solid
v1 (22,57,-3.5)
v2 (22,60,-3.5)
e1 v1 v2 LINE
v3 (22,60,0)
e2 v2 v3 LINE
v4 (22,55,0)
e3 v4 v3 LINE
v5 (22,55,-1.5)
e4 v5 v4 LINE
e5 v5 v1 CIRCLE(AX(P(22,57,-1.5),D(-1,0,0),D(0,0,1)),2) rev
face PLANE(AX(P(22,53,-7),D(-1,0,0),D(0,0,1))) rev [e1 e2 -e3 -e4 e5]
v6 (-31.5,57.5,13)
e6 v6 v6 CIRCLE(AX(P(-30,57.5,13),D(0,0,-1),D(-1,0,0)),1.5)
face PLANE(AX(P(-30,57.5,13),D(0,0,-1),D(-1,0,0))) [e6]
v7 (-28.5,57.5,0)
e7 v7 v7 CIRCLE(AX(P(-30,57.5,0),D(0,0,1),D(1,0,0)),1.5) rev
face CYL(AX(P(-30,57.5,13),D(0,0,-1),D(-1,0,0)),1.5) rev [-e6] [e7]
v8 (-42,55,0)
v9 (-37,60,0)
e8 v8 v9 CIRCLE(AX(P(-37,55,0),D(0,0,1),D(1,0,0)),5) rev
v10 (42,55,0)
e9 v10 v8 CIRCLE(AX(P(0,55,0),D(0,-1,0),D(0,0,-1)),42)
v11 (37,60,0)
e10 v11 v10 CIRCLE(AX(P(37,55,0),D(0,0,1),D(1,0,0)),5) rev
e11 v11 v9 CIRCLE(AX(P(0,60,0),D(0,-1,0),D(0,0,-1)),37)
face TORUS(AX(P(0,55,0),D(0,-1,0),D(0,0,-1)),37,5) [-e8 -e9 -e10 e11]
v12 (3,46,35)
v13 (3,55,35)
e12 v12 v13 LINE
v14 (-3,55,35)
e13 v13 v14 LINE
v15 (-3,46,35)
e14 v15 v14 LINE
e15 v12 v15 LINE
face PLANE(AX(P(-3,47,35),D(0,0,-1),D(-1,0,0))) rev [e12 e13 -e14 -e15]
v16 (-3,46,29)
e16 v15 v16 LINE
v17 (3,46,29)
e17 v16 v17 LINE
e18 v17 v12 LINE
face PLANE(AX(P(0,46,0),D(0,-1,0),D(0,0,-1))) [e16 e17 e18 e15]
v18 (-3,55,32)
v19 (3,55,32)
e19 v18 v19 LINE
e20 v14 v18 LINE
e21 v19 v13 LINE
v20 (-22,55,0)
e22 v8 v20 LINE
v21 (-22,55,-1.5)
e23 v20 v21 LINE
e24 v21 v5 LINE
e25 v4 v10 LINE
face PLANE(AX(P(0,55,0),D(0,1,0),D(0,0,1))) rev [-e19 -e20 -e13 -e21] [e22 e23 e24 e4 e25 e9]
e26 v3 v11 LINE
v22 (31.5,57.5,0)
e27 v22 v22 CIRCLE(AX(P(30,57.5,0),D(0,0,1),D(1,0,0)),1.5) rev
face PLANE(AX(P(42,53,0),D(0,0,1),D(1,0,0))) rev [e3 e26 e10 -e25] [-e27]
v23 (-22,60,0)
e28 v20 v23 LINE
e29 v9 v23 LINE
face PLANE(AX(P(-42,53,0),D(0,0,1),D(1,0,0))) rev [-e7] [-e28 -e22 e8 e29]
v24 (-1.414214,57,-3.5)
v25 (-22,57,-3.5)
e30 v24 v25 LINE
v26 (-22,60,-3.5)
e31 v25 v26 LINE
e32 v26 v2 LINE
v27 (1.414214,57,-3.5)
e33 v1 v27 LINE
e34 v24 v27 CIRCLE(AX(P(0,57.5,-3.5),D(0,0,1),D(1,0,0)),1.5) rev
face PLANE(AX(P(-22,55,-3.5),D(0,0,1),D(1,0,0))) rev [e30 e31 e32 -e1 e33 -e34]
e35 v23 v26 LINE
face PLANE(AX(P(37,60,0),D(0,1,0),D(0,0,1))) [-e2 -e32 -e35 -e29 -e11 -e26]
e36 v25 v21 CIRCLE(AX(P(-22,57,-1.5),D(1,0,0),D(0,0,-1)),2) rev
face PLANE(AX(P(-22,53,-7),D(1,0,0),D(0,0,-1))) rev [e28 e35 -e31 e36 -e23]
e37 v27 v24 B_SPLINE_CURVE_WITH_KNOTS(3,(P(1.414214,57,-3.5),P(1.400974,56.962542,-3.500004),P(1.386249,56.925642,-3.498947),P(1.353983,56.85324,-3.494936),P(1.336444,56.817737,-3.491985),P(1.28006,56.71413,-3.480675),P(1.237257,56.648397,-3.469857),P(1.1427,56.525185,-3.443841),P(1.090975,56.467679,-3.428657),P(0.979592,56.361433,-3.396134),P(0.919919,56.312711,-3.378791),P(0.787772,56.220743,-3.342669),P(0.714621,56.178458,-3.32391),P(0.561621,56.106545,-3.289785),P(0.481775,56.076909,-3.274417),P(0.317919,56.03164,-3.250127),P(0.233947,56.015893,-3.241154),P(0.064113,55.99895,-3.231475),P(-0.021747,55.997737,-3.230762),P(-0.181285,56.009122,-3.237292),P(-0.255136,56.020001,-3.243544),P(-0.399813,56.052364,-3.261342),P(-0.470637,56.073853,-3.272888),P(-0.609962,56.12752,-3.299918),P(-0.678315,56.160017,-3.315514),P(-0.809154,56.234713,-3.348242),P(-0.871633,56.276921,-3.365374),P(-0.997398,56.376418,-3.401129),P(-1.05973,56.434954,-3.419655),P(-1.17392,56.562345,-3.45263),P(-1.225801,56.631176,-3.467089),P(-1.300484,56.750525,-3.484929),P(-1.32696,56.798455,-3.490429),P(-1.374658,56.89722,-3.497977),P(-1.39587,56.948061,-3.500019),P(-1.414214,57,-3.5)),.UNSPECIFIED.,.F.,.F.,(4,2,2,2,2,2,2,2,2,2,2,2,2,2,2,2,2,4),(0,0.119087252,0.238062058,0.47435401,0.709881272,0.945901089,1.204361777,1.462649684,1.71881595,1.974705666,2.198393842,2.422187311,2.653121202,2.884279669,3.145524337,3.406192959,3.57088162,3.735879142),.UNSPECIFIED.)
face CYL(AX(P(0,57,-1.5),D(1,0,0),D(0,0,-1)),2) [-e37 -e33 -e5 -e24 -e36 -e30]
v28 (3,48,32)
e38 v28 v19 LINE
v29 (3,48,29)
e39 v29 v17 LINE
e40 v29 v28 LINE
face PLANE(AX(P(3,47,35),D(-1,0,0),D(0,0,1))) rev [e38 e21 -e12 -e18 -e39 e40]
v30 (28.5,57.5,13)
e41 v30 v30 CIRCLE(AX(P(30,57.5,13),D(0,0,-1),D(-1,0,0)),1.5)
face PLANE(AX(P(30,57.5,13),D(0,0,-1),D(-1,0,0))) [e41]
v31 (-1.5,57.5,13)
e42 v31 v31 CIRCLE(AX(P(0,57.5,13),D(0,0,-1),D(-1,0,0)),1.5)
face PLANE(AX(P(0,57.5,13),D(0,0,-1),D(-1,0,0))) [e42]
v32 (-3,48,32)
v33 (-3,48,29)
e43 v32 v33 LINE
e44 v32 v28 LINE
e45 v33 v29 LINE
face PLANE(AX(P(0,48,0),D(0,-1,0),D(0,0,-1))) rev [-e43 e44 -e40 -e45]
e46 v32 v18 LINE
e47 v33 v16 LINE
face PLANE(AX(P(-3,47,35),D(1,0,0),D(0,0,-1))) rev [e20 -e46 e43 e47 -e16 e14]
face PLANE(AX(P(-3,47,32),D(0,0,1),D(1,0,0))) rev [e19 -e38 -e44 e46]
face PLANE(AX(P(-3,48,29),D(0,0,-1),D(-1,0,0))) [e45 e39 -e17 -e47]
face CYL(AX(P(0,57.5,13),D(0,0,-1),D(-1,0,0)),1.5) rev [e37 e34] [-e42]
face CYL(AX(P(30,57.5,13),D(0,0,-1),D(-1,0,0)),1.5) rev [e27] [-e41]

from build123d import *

# Parameters (mm, degrees)
CUT_EXTRUDE1_DEPTH       = 5
CUT_EXTRUDE3_DEPTH       = 45
SKETCH8_R                = 40
CUT_EXTRUDE4_DEPTH       = 32
SKETCH9_R                = 32
SKETCH9_R_2              = 24.5
CUT_EXTRUDE5_DEPTH       = 14
SKETCH10_R               = 26
CUT_EXTRUDE6_DEPTH       = 14
FILLET1_R                = 7
FILLET2_R                = 7
CUT_REVOLVE1_START       = 22
CUT_REVOLVE1_DEPTH       = 30.5
CUT_EXTRUDE12_DEPTH      = 5
SKETCH18_W               = 13
SKETCH18_H               = 8
CUT_EXTRUDE13_DEPTH      = 5
INTERSECT1_OUTLINE_R     = 42
INTERSECT1_DEPTH         = 55
SKETCH20_W               = 6
SKETCH20_H               = 3
BOSS_EXTRUDE1_DEPTH      = 8
BOSS_EXTRUDE2_DEPTH      = 1
BOSS_EXTRUDE2_DEPTH_BACK = 1
SKETCH21_W               = 6
SKETCH21_H               = 6
BOSS_EXTRUDE3_DEPTH      = 7
SKETCH19_R               = 1.5
CUT_EXTRUDE14_DEPTH      = 20
SKETCH23_W               = 20
SKETCH23_H               = 7
CUT_EXTRUDE15_DEPTH      = 7
SKETCH24_W               = 44
SKETCH24_H               = 3.5
CUT_EXTRUDE16_DEPTH      = 5
FILLET3_R                = 2


# Read off the part's stored shape, not the designer's step: Cut-Revolve1, Intersect1
with BuildPart() as part:
    # Sketch1 → Revolve1 (revolve)
    with BuildSketch(Plane.XY, mode=Mode.PRIVATE) as revolve1_sk:
        with BuildLine():
            Line((22.5, 0), (32, 0))
            ThreePointArc((32, 0), (33.414213562, 0.585786438), (34, 2))
            Line((34, 2), (34, 18))
            Line((34, 18), (40, 18))
            ThreePointArc((40, 18), (41.414213562, 18.585786438), (42, 20))
            Line((42, 20), (42, 55))
            ThreePointArc((42, 55), (40.535533906, 58.535533906), (37, 60))
            Line((37, 60), (0, 60))
            Line((0, 60), (0, 18))
            Line((0, 18), (22.5, 18))
            Line((22.5, 18), (22.5, 0))
        make_face()
    revolve(revolve1_sk.sketch.rotate(Axis((0, 2, 0), (0, 1, 0)), 90), axis=Axis((0, 2, 0), (0, 1, 0)))

    # Sketch5 → Cut-Extrude1 (cut)
    with BuildSketch(Plane(origin=(0, 60, 0), x_dir=(1, 0, 0), z_dir=(0, 1, 0))):
        with BuildLine():
            Line((-42, 0), (-40, 0))
            Line((-40, 0), (40, 0))
            Line((40, 0), (42, 0))
            ThreePointArc((42, 0), (0, 42), (-42, 0))
        make_face()
    extrude(amount=-CUT_EXTRUDE1_DEPTH, mode=Mode.SUBTRACT)

    # Sketch7 → Cut-Extrude3 (cut)
    with BuildSketch(Plane.XZ.offset(-18)):
        with BuildLine():
            Line((-21, 0), (21, 0))
            ThreePointArc((21, 0), (0, -21), (-21, 0))
        make_face()
    extrude(amount=-CUT_EXTRUDE3_DEPTH, mode=Mode.SUBTRACT)

    # Sketch8 → Cut-Extrude4 (cut)
    with BuildSketch(Plane(origin=(0, 52.5, 0), x_dir=(1, 0, 0), z_dir=(0, 1, 0))):
        with Locations(Location((0, 0, 0), (0, 0, 270))):
            Circle(SKETCH8_R)
        with BuildLine():
            Line((22.912878475, -2), (-22.912878475, -2))
            ThreePointArc((-22.912878475, -2), (0, 23), (22.912878475, -2))
        make_face(mode=Mode.SUBTRACT)
    extrude(amount=-CUT_EXTRUDE4_DEPTH, mode=Mode.SUBTRACT)

    # Sketch9 → Cut-Extrude5 (cut)
    with BuildSketch(Plane(origin=(0, 2, 0), x_dir=(-1, 0, 0), z_dir=(0, -1, 0))):
        with Locations(Location((0, 0, 0), (0, 0, 90))):
            Circle(SKETCH9_R)
        with Locations(Location((0, 0, 0), (0, 0, 90))):
            Circle(SKETCH9_R_2, mode=Mode.SUBTRACT)
    extrude(amount=-CUT_EXTRUDE5_DEPTH, mode=Mode.SUBTRACT)

    # Sketch10 → Cut-Extrude6 (cut)
    with BuildSketch(Plane(origin=(0, 2, 0), x_dir=(-1, 0, 0), z_dir=(0, -1, 0))):
        Circle(SKETCH10_R)
    extrude(amount=-CUT_EXTRUDE6_DEPTH, mode=Mode.SUBTRACT)

    # Fillet1
    fillet1_edges = [part.edges().sort_by_distance(p)[0] for p in [
        (21, 36.5, 0),
        (-21, 36.5, 0),
    ]]
    fillet(fillet1_edges, radius=FILLET1_R)

    # Fillet2
    fillet2_edges = [part.edges().sort_by_distance(p)[0] for p in [
        (-22.912878475, 36.5, 2),
        (22.912878475, 36.5, 2),
    ]]
    fillet(fillet2_edges, radius=FILLET2_R)

    # Cut-Revolve1 outline → Cut-Revolve1 (cut)
    with BuildSketch(Plane(origin=(0, 0, 0), x_dir=(1, 0, 0), z_dir=(0, 1, 0)).offset(CUT_REVOLVE1_START)):
        with BuildLine():
            Line((-34.641016151, -20), (-36.373066959, -21))
            ThreePointArc((-36.373066959, -21), (0, -42), (36.373066959, -21))
            Line((36.373066959, -21), (34.641016151, -20))
            ThreePointArc((34.641016151, -20), (0, -40), (-34.641016151, -20))
        make_face()
    extrude(amount=CUT_REVOLVE1_DEPTH, mode=Mode.SUBTRACT)

    # Sketch15 → Cut-Extrude12 (cut)
    with BuildSketch(Plane(origin=(0, 20.5, 0), x_dir=(1, 0, 0), z_dir=(0, 1, 0))):
        with BuildLine():
            Line((-28.124355653, -3.514579578), (-26.124355653, -3.514579578))
            ThreePointArc((-26.124355653, -3.514579578), (-24.710142091, -2.928793141), (-24.124355653, -1.514579578))
            Line((-24.124355653, -1.514579578), (-24.124355653, 8.485420422))
            ThreePointArc((-24.124355653, 8.485420422), (-24.710142091, 9.899633984), (-26.124355653, 10.485420422))
            Line((-26.124355653, 10.485420422), (-28.124355653, 10.485420422))
            ThreePointArc((-28.124355653, 10.485420422), (-29.538569215, 9.899633984), (-30.124355653, 8.485420422))
            Line((-30.124355653, 8.485420422), (-30.124355653, -1.514579578))
            ThreePointArc((-30.124355653, -1.514579578), (-29.538569215, -2.928793141), (-28.124355653, -3.514579578))
        make_face()
    extrude(amount=-CUT_EXTRUDE12_DEPTH, mode=Mode.SUBTRACT)

    # Sketch18 → Cut-Extrude13 (cut)
    with BuildSketch(Plane(origin=(0, 55, 0), x_dir=(1, 0, 0), z_dir=(0, 1, 0))):
        with Locations((0.796512215, 32.951769165)):
            Rectangle(SKETCH18_W, SKETCH18_H)
    extrude(amount=-CUT_EXTRUDE13_DEPTH, mode=Mode.SUBTRACT)

    # Intersect1 outline → Intersect1 (cut)
    with BuildSketch(Plane(origin=(0, 0, 0), x_dir=(1, 0, 0), z_dir=(0, 1, 0))):
        Circle(INTERSECT1_OUTLINE_R)
        with BuildLine():
            Line((12.124355653, 0), (-12.124355653, 0))
            ThreePointArc((-12.124355653, 0), (-18.186533479, 3.5), (-18.186533479, 10.5))
            ThreePointArc((-18.186533479, 10.5), (0, 21), (18.186533479, 10.5))
            ThreePointArc((18.186533479, 10.5), (18.186533479, 3.5), (12.124355653, 0))
        make_face(mode=Mode.SUBTRACT)
    extrude(amount=INTERSECT1_DEPTH, mode=Mode.SUBTRACT)

    # Sketch20 → Boss-Extrude1 (add)
    with BuildSketch(Plane.XZ.offset(-55)):
        with Locations((0, 33.5)):
            Rectangle(SKETCH20_W, SKETCH20_H)
    extrude(amount=BOSS_EXTRUDE1_DEPTH)

    # Sketch21 → Boss-Extrude2 (add, two sides: drawn at the far end of the back side and taken through both)
    with BuildSketch(Plane.XZ.offset(-47).offset(-BOSS_EXTRUDE2_DEPTH_BACK)):
        with Locations((0, 32)):
            Rectangle(SKETCH21_W, SKETCH21_H)
    extrude(amount=BOSS_EXTRUDE2_DEPTH + BOSS_EXTRUDE2_DEPTH_BACK)

    # Sketch22 → Boss-Extrude3 (add)
    with BuildSketch(Plane(origin=(0, 0, 0), x_dir=(-1, 0, 0), z_dir=(0, 0, -1))):
        with BuildLine():
            Line((-42, 55), (42, 55))
            ThreePointArc((42, 55), (40.535533906, 58.535533906), (37, 60))
            Line((37, 60), (-37, 60))
            ThreePointArc((-37, 60), (-40.535533906, 58.535533906), (-42, 55))
        make_face()
    extrude(amount=BOSS_EXTRUDE3_DEPTH)

    # Sketch19 → Cut-Extrude14 (cut)
    with BuildSketch(Plane(origin=(0, 0, -7), x_dir=(-1, 0, 0), z_dir=(0, 0, -1))):
        with Locations((0, 57.5)):
            Circle(SKETCH19_R)
        with Locations((-30, 57.5)):
            Circle(SKETCH19_R)
        with Locations((30, 57.5)):
            Circle(SKETCH19_R)
    extrude(amount=-CUT_EXTRUDE14_DEPTH, mode=Mode.SUBTRACT)

    # Sketch23 → Cut-Extrude15 (cut)
    with BuildSketch(Plane(origin=(0, 60, 0), x_dir=(1, 0, 0), z_dir=(0, 1, 0))):
        with Locations((-32, 3.5)):
            Rectangle(SKETCH23_W, SKETCH23_H)
        with Locations((32, 3.5)):
            Rectangle(SKETCH23_W, SKETCH23_H)
    extrude(amount=-CUT_EXTRUDE15_DEPTH, mode=Mode.SUBTRACT)

    # Sketch24 → Cut-Extrude16 (cut)
    with BuildSketch(Plane(origin=(0, 60, 0), x_dir=(1, 0, 0), z_dir=(0, 1, 0))):
        with Locations((0, 5.25)):
            Rectangle(SKETCH24_W, SKETCH24_H)
    extrude(amount=-CUT_EXTRUDE16_DEPTH, mode=Mode.SUBTRACT)

    # Fillet3
    # the kernel refuses this fillet: 2 mm, written as the material it takes off along each edge
    with BuildSketch(Plane(origin=(27, 55, -3.5), x_dir=(0, 0, 1), z_dir=(-1, 0, 0))) as fillet3_piece_1:
        with BuildLine():
            CenterArc((FILLET3_R, FILLET3_R), FILLET3_R, 180, 90)
            Line((0, FILLET3_R), (0, 0))
            Line((0, 0), (FILLET3_R, 0))
        make_face()
    extrude(amount=54, mode=Mode.SUBTRACT)


solid = part.part
